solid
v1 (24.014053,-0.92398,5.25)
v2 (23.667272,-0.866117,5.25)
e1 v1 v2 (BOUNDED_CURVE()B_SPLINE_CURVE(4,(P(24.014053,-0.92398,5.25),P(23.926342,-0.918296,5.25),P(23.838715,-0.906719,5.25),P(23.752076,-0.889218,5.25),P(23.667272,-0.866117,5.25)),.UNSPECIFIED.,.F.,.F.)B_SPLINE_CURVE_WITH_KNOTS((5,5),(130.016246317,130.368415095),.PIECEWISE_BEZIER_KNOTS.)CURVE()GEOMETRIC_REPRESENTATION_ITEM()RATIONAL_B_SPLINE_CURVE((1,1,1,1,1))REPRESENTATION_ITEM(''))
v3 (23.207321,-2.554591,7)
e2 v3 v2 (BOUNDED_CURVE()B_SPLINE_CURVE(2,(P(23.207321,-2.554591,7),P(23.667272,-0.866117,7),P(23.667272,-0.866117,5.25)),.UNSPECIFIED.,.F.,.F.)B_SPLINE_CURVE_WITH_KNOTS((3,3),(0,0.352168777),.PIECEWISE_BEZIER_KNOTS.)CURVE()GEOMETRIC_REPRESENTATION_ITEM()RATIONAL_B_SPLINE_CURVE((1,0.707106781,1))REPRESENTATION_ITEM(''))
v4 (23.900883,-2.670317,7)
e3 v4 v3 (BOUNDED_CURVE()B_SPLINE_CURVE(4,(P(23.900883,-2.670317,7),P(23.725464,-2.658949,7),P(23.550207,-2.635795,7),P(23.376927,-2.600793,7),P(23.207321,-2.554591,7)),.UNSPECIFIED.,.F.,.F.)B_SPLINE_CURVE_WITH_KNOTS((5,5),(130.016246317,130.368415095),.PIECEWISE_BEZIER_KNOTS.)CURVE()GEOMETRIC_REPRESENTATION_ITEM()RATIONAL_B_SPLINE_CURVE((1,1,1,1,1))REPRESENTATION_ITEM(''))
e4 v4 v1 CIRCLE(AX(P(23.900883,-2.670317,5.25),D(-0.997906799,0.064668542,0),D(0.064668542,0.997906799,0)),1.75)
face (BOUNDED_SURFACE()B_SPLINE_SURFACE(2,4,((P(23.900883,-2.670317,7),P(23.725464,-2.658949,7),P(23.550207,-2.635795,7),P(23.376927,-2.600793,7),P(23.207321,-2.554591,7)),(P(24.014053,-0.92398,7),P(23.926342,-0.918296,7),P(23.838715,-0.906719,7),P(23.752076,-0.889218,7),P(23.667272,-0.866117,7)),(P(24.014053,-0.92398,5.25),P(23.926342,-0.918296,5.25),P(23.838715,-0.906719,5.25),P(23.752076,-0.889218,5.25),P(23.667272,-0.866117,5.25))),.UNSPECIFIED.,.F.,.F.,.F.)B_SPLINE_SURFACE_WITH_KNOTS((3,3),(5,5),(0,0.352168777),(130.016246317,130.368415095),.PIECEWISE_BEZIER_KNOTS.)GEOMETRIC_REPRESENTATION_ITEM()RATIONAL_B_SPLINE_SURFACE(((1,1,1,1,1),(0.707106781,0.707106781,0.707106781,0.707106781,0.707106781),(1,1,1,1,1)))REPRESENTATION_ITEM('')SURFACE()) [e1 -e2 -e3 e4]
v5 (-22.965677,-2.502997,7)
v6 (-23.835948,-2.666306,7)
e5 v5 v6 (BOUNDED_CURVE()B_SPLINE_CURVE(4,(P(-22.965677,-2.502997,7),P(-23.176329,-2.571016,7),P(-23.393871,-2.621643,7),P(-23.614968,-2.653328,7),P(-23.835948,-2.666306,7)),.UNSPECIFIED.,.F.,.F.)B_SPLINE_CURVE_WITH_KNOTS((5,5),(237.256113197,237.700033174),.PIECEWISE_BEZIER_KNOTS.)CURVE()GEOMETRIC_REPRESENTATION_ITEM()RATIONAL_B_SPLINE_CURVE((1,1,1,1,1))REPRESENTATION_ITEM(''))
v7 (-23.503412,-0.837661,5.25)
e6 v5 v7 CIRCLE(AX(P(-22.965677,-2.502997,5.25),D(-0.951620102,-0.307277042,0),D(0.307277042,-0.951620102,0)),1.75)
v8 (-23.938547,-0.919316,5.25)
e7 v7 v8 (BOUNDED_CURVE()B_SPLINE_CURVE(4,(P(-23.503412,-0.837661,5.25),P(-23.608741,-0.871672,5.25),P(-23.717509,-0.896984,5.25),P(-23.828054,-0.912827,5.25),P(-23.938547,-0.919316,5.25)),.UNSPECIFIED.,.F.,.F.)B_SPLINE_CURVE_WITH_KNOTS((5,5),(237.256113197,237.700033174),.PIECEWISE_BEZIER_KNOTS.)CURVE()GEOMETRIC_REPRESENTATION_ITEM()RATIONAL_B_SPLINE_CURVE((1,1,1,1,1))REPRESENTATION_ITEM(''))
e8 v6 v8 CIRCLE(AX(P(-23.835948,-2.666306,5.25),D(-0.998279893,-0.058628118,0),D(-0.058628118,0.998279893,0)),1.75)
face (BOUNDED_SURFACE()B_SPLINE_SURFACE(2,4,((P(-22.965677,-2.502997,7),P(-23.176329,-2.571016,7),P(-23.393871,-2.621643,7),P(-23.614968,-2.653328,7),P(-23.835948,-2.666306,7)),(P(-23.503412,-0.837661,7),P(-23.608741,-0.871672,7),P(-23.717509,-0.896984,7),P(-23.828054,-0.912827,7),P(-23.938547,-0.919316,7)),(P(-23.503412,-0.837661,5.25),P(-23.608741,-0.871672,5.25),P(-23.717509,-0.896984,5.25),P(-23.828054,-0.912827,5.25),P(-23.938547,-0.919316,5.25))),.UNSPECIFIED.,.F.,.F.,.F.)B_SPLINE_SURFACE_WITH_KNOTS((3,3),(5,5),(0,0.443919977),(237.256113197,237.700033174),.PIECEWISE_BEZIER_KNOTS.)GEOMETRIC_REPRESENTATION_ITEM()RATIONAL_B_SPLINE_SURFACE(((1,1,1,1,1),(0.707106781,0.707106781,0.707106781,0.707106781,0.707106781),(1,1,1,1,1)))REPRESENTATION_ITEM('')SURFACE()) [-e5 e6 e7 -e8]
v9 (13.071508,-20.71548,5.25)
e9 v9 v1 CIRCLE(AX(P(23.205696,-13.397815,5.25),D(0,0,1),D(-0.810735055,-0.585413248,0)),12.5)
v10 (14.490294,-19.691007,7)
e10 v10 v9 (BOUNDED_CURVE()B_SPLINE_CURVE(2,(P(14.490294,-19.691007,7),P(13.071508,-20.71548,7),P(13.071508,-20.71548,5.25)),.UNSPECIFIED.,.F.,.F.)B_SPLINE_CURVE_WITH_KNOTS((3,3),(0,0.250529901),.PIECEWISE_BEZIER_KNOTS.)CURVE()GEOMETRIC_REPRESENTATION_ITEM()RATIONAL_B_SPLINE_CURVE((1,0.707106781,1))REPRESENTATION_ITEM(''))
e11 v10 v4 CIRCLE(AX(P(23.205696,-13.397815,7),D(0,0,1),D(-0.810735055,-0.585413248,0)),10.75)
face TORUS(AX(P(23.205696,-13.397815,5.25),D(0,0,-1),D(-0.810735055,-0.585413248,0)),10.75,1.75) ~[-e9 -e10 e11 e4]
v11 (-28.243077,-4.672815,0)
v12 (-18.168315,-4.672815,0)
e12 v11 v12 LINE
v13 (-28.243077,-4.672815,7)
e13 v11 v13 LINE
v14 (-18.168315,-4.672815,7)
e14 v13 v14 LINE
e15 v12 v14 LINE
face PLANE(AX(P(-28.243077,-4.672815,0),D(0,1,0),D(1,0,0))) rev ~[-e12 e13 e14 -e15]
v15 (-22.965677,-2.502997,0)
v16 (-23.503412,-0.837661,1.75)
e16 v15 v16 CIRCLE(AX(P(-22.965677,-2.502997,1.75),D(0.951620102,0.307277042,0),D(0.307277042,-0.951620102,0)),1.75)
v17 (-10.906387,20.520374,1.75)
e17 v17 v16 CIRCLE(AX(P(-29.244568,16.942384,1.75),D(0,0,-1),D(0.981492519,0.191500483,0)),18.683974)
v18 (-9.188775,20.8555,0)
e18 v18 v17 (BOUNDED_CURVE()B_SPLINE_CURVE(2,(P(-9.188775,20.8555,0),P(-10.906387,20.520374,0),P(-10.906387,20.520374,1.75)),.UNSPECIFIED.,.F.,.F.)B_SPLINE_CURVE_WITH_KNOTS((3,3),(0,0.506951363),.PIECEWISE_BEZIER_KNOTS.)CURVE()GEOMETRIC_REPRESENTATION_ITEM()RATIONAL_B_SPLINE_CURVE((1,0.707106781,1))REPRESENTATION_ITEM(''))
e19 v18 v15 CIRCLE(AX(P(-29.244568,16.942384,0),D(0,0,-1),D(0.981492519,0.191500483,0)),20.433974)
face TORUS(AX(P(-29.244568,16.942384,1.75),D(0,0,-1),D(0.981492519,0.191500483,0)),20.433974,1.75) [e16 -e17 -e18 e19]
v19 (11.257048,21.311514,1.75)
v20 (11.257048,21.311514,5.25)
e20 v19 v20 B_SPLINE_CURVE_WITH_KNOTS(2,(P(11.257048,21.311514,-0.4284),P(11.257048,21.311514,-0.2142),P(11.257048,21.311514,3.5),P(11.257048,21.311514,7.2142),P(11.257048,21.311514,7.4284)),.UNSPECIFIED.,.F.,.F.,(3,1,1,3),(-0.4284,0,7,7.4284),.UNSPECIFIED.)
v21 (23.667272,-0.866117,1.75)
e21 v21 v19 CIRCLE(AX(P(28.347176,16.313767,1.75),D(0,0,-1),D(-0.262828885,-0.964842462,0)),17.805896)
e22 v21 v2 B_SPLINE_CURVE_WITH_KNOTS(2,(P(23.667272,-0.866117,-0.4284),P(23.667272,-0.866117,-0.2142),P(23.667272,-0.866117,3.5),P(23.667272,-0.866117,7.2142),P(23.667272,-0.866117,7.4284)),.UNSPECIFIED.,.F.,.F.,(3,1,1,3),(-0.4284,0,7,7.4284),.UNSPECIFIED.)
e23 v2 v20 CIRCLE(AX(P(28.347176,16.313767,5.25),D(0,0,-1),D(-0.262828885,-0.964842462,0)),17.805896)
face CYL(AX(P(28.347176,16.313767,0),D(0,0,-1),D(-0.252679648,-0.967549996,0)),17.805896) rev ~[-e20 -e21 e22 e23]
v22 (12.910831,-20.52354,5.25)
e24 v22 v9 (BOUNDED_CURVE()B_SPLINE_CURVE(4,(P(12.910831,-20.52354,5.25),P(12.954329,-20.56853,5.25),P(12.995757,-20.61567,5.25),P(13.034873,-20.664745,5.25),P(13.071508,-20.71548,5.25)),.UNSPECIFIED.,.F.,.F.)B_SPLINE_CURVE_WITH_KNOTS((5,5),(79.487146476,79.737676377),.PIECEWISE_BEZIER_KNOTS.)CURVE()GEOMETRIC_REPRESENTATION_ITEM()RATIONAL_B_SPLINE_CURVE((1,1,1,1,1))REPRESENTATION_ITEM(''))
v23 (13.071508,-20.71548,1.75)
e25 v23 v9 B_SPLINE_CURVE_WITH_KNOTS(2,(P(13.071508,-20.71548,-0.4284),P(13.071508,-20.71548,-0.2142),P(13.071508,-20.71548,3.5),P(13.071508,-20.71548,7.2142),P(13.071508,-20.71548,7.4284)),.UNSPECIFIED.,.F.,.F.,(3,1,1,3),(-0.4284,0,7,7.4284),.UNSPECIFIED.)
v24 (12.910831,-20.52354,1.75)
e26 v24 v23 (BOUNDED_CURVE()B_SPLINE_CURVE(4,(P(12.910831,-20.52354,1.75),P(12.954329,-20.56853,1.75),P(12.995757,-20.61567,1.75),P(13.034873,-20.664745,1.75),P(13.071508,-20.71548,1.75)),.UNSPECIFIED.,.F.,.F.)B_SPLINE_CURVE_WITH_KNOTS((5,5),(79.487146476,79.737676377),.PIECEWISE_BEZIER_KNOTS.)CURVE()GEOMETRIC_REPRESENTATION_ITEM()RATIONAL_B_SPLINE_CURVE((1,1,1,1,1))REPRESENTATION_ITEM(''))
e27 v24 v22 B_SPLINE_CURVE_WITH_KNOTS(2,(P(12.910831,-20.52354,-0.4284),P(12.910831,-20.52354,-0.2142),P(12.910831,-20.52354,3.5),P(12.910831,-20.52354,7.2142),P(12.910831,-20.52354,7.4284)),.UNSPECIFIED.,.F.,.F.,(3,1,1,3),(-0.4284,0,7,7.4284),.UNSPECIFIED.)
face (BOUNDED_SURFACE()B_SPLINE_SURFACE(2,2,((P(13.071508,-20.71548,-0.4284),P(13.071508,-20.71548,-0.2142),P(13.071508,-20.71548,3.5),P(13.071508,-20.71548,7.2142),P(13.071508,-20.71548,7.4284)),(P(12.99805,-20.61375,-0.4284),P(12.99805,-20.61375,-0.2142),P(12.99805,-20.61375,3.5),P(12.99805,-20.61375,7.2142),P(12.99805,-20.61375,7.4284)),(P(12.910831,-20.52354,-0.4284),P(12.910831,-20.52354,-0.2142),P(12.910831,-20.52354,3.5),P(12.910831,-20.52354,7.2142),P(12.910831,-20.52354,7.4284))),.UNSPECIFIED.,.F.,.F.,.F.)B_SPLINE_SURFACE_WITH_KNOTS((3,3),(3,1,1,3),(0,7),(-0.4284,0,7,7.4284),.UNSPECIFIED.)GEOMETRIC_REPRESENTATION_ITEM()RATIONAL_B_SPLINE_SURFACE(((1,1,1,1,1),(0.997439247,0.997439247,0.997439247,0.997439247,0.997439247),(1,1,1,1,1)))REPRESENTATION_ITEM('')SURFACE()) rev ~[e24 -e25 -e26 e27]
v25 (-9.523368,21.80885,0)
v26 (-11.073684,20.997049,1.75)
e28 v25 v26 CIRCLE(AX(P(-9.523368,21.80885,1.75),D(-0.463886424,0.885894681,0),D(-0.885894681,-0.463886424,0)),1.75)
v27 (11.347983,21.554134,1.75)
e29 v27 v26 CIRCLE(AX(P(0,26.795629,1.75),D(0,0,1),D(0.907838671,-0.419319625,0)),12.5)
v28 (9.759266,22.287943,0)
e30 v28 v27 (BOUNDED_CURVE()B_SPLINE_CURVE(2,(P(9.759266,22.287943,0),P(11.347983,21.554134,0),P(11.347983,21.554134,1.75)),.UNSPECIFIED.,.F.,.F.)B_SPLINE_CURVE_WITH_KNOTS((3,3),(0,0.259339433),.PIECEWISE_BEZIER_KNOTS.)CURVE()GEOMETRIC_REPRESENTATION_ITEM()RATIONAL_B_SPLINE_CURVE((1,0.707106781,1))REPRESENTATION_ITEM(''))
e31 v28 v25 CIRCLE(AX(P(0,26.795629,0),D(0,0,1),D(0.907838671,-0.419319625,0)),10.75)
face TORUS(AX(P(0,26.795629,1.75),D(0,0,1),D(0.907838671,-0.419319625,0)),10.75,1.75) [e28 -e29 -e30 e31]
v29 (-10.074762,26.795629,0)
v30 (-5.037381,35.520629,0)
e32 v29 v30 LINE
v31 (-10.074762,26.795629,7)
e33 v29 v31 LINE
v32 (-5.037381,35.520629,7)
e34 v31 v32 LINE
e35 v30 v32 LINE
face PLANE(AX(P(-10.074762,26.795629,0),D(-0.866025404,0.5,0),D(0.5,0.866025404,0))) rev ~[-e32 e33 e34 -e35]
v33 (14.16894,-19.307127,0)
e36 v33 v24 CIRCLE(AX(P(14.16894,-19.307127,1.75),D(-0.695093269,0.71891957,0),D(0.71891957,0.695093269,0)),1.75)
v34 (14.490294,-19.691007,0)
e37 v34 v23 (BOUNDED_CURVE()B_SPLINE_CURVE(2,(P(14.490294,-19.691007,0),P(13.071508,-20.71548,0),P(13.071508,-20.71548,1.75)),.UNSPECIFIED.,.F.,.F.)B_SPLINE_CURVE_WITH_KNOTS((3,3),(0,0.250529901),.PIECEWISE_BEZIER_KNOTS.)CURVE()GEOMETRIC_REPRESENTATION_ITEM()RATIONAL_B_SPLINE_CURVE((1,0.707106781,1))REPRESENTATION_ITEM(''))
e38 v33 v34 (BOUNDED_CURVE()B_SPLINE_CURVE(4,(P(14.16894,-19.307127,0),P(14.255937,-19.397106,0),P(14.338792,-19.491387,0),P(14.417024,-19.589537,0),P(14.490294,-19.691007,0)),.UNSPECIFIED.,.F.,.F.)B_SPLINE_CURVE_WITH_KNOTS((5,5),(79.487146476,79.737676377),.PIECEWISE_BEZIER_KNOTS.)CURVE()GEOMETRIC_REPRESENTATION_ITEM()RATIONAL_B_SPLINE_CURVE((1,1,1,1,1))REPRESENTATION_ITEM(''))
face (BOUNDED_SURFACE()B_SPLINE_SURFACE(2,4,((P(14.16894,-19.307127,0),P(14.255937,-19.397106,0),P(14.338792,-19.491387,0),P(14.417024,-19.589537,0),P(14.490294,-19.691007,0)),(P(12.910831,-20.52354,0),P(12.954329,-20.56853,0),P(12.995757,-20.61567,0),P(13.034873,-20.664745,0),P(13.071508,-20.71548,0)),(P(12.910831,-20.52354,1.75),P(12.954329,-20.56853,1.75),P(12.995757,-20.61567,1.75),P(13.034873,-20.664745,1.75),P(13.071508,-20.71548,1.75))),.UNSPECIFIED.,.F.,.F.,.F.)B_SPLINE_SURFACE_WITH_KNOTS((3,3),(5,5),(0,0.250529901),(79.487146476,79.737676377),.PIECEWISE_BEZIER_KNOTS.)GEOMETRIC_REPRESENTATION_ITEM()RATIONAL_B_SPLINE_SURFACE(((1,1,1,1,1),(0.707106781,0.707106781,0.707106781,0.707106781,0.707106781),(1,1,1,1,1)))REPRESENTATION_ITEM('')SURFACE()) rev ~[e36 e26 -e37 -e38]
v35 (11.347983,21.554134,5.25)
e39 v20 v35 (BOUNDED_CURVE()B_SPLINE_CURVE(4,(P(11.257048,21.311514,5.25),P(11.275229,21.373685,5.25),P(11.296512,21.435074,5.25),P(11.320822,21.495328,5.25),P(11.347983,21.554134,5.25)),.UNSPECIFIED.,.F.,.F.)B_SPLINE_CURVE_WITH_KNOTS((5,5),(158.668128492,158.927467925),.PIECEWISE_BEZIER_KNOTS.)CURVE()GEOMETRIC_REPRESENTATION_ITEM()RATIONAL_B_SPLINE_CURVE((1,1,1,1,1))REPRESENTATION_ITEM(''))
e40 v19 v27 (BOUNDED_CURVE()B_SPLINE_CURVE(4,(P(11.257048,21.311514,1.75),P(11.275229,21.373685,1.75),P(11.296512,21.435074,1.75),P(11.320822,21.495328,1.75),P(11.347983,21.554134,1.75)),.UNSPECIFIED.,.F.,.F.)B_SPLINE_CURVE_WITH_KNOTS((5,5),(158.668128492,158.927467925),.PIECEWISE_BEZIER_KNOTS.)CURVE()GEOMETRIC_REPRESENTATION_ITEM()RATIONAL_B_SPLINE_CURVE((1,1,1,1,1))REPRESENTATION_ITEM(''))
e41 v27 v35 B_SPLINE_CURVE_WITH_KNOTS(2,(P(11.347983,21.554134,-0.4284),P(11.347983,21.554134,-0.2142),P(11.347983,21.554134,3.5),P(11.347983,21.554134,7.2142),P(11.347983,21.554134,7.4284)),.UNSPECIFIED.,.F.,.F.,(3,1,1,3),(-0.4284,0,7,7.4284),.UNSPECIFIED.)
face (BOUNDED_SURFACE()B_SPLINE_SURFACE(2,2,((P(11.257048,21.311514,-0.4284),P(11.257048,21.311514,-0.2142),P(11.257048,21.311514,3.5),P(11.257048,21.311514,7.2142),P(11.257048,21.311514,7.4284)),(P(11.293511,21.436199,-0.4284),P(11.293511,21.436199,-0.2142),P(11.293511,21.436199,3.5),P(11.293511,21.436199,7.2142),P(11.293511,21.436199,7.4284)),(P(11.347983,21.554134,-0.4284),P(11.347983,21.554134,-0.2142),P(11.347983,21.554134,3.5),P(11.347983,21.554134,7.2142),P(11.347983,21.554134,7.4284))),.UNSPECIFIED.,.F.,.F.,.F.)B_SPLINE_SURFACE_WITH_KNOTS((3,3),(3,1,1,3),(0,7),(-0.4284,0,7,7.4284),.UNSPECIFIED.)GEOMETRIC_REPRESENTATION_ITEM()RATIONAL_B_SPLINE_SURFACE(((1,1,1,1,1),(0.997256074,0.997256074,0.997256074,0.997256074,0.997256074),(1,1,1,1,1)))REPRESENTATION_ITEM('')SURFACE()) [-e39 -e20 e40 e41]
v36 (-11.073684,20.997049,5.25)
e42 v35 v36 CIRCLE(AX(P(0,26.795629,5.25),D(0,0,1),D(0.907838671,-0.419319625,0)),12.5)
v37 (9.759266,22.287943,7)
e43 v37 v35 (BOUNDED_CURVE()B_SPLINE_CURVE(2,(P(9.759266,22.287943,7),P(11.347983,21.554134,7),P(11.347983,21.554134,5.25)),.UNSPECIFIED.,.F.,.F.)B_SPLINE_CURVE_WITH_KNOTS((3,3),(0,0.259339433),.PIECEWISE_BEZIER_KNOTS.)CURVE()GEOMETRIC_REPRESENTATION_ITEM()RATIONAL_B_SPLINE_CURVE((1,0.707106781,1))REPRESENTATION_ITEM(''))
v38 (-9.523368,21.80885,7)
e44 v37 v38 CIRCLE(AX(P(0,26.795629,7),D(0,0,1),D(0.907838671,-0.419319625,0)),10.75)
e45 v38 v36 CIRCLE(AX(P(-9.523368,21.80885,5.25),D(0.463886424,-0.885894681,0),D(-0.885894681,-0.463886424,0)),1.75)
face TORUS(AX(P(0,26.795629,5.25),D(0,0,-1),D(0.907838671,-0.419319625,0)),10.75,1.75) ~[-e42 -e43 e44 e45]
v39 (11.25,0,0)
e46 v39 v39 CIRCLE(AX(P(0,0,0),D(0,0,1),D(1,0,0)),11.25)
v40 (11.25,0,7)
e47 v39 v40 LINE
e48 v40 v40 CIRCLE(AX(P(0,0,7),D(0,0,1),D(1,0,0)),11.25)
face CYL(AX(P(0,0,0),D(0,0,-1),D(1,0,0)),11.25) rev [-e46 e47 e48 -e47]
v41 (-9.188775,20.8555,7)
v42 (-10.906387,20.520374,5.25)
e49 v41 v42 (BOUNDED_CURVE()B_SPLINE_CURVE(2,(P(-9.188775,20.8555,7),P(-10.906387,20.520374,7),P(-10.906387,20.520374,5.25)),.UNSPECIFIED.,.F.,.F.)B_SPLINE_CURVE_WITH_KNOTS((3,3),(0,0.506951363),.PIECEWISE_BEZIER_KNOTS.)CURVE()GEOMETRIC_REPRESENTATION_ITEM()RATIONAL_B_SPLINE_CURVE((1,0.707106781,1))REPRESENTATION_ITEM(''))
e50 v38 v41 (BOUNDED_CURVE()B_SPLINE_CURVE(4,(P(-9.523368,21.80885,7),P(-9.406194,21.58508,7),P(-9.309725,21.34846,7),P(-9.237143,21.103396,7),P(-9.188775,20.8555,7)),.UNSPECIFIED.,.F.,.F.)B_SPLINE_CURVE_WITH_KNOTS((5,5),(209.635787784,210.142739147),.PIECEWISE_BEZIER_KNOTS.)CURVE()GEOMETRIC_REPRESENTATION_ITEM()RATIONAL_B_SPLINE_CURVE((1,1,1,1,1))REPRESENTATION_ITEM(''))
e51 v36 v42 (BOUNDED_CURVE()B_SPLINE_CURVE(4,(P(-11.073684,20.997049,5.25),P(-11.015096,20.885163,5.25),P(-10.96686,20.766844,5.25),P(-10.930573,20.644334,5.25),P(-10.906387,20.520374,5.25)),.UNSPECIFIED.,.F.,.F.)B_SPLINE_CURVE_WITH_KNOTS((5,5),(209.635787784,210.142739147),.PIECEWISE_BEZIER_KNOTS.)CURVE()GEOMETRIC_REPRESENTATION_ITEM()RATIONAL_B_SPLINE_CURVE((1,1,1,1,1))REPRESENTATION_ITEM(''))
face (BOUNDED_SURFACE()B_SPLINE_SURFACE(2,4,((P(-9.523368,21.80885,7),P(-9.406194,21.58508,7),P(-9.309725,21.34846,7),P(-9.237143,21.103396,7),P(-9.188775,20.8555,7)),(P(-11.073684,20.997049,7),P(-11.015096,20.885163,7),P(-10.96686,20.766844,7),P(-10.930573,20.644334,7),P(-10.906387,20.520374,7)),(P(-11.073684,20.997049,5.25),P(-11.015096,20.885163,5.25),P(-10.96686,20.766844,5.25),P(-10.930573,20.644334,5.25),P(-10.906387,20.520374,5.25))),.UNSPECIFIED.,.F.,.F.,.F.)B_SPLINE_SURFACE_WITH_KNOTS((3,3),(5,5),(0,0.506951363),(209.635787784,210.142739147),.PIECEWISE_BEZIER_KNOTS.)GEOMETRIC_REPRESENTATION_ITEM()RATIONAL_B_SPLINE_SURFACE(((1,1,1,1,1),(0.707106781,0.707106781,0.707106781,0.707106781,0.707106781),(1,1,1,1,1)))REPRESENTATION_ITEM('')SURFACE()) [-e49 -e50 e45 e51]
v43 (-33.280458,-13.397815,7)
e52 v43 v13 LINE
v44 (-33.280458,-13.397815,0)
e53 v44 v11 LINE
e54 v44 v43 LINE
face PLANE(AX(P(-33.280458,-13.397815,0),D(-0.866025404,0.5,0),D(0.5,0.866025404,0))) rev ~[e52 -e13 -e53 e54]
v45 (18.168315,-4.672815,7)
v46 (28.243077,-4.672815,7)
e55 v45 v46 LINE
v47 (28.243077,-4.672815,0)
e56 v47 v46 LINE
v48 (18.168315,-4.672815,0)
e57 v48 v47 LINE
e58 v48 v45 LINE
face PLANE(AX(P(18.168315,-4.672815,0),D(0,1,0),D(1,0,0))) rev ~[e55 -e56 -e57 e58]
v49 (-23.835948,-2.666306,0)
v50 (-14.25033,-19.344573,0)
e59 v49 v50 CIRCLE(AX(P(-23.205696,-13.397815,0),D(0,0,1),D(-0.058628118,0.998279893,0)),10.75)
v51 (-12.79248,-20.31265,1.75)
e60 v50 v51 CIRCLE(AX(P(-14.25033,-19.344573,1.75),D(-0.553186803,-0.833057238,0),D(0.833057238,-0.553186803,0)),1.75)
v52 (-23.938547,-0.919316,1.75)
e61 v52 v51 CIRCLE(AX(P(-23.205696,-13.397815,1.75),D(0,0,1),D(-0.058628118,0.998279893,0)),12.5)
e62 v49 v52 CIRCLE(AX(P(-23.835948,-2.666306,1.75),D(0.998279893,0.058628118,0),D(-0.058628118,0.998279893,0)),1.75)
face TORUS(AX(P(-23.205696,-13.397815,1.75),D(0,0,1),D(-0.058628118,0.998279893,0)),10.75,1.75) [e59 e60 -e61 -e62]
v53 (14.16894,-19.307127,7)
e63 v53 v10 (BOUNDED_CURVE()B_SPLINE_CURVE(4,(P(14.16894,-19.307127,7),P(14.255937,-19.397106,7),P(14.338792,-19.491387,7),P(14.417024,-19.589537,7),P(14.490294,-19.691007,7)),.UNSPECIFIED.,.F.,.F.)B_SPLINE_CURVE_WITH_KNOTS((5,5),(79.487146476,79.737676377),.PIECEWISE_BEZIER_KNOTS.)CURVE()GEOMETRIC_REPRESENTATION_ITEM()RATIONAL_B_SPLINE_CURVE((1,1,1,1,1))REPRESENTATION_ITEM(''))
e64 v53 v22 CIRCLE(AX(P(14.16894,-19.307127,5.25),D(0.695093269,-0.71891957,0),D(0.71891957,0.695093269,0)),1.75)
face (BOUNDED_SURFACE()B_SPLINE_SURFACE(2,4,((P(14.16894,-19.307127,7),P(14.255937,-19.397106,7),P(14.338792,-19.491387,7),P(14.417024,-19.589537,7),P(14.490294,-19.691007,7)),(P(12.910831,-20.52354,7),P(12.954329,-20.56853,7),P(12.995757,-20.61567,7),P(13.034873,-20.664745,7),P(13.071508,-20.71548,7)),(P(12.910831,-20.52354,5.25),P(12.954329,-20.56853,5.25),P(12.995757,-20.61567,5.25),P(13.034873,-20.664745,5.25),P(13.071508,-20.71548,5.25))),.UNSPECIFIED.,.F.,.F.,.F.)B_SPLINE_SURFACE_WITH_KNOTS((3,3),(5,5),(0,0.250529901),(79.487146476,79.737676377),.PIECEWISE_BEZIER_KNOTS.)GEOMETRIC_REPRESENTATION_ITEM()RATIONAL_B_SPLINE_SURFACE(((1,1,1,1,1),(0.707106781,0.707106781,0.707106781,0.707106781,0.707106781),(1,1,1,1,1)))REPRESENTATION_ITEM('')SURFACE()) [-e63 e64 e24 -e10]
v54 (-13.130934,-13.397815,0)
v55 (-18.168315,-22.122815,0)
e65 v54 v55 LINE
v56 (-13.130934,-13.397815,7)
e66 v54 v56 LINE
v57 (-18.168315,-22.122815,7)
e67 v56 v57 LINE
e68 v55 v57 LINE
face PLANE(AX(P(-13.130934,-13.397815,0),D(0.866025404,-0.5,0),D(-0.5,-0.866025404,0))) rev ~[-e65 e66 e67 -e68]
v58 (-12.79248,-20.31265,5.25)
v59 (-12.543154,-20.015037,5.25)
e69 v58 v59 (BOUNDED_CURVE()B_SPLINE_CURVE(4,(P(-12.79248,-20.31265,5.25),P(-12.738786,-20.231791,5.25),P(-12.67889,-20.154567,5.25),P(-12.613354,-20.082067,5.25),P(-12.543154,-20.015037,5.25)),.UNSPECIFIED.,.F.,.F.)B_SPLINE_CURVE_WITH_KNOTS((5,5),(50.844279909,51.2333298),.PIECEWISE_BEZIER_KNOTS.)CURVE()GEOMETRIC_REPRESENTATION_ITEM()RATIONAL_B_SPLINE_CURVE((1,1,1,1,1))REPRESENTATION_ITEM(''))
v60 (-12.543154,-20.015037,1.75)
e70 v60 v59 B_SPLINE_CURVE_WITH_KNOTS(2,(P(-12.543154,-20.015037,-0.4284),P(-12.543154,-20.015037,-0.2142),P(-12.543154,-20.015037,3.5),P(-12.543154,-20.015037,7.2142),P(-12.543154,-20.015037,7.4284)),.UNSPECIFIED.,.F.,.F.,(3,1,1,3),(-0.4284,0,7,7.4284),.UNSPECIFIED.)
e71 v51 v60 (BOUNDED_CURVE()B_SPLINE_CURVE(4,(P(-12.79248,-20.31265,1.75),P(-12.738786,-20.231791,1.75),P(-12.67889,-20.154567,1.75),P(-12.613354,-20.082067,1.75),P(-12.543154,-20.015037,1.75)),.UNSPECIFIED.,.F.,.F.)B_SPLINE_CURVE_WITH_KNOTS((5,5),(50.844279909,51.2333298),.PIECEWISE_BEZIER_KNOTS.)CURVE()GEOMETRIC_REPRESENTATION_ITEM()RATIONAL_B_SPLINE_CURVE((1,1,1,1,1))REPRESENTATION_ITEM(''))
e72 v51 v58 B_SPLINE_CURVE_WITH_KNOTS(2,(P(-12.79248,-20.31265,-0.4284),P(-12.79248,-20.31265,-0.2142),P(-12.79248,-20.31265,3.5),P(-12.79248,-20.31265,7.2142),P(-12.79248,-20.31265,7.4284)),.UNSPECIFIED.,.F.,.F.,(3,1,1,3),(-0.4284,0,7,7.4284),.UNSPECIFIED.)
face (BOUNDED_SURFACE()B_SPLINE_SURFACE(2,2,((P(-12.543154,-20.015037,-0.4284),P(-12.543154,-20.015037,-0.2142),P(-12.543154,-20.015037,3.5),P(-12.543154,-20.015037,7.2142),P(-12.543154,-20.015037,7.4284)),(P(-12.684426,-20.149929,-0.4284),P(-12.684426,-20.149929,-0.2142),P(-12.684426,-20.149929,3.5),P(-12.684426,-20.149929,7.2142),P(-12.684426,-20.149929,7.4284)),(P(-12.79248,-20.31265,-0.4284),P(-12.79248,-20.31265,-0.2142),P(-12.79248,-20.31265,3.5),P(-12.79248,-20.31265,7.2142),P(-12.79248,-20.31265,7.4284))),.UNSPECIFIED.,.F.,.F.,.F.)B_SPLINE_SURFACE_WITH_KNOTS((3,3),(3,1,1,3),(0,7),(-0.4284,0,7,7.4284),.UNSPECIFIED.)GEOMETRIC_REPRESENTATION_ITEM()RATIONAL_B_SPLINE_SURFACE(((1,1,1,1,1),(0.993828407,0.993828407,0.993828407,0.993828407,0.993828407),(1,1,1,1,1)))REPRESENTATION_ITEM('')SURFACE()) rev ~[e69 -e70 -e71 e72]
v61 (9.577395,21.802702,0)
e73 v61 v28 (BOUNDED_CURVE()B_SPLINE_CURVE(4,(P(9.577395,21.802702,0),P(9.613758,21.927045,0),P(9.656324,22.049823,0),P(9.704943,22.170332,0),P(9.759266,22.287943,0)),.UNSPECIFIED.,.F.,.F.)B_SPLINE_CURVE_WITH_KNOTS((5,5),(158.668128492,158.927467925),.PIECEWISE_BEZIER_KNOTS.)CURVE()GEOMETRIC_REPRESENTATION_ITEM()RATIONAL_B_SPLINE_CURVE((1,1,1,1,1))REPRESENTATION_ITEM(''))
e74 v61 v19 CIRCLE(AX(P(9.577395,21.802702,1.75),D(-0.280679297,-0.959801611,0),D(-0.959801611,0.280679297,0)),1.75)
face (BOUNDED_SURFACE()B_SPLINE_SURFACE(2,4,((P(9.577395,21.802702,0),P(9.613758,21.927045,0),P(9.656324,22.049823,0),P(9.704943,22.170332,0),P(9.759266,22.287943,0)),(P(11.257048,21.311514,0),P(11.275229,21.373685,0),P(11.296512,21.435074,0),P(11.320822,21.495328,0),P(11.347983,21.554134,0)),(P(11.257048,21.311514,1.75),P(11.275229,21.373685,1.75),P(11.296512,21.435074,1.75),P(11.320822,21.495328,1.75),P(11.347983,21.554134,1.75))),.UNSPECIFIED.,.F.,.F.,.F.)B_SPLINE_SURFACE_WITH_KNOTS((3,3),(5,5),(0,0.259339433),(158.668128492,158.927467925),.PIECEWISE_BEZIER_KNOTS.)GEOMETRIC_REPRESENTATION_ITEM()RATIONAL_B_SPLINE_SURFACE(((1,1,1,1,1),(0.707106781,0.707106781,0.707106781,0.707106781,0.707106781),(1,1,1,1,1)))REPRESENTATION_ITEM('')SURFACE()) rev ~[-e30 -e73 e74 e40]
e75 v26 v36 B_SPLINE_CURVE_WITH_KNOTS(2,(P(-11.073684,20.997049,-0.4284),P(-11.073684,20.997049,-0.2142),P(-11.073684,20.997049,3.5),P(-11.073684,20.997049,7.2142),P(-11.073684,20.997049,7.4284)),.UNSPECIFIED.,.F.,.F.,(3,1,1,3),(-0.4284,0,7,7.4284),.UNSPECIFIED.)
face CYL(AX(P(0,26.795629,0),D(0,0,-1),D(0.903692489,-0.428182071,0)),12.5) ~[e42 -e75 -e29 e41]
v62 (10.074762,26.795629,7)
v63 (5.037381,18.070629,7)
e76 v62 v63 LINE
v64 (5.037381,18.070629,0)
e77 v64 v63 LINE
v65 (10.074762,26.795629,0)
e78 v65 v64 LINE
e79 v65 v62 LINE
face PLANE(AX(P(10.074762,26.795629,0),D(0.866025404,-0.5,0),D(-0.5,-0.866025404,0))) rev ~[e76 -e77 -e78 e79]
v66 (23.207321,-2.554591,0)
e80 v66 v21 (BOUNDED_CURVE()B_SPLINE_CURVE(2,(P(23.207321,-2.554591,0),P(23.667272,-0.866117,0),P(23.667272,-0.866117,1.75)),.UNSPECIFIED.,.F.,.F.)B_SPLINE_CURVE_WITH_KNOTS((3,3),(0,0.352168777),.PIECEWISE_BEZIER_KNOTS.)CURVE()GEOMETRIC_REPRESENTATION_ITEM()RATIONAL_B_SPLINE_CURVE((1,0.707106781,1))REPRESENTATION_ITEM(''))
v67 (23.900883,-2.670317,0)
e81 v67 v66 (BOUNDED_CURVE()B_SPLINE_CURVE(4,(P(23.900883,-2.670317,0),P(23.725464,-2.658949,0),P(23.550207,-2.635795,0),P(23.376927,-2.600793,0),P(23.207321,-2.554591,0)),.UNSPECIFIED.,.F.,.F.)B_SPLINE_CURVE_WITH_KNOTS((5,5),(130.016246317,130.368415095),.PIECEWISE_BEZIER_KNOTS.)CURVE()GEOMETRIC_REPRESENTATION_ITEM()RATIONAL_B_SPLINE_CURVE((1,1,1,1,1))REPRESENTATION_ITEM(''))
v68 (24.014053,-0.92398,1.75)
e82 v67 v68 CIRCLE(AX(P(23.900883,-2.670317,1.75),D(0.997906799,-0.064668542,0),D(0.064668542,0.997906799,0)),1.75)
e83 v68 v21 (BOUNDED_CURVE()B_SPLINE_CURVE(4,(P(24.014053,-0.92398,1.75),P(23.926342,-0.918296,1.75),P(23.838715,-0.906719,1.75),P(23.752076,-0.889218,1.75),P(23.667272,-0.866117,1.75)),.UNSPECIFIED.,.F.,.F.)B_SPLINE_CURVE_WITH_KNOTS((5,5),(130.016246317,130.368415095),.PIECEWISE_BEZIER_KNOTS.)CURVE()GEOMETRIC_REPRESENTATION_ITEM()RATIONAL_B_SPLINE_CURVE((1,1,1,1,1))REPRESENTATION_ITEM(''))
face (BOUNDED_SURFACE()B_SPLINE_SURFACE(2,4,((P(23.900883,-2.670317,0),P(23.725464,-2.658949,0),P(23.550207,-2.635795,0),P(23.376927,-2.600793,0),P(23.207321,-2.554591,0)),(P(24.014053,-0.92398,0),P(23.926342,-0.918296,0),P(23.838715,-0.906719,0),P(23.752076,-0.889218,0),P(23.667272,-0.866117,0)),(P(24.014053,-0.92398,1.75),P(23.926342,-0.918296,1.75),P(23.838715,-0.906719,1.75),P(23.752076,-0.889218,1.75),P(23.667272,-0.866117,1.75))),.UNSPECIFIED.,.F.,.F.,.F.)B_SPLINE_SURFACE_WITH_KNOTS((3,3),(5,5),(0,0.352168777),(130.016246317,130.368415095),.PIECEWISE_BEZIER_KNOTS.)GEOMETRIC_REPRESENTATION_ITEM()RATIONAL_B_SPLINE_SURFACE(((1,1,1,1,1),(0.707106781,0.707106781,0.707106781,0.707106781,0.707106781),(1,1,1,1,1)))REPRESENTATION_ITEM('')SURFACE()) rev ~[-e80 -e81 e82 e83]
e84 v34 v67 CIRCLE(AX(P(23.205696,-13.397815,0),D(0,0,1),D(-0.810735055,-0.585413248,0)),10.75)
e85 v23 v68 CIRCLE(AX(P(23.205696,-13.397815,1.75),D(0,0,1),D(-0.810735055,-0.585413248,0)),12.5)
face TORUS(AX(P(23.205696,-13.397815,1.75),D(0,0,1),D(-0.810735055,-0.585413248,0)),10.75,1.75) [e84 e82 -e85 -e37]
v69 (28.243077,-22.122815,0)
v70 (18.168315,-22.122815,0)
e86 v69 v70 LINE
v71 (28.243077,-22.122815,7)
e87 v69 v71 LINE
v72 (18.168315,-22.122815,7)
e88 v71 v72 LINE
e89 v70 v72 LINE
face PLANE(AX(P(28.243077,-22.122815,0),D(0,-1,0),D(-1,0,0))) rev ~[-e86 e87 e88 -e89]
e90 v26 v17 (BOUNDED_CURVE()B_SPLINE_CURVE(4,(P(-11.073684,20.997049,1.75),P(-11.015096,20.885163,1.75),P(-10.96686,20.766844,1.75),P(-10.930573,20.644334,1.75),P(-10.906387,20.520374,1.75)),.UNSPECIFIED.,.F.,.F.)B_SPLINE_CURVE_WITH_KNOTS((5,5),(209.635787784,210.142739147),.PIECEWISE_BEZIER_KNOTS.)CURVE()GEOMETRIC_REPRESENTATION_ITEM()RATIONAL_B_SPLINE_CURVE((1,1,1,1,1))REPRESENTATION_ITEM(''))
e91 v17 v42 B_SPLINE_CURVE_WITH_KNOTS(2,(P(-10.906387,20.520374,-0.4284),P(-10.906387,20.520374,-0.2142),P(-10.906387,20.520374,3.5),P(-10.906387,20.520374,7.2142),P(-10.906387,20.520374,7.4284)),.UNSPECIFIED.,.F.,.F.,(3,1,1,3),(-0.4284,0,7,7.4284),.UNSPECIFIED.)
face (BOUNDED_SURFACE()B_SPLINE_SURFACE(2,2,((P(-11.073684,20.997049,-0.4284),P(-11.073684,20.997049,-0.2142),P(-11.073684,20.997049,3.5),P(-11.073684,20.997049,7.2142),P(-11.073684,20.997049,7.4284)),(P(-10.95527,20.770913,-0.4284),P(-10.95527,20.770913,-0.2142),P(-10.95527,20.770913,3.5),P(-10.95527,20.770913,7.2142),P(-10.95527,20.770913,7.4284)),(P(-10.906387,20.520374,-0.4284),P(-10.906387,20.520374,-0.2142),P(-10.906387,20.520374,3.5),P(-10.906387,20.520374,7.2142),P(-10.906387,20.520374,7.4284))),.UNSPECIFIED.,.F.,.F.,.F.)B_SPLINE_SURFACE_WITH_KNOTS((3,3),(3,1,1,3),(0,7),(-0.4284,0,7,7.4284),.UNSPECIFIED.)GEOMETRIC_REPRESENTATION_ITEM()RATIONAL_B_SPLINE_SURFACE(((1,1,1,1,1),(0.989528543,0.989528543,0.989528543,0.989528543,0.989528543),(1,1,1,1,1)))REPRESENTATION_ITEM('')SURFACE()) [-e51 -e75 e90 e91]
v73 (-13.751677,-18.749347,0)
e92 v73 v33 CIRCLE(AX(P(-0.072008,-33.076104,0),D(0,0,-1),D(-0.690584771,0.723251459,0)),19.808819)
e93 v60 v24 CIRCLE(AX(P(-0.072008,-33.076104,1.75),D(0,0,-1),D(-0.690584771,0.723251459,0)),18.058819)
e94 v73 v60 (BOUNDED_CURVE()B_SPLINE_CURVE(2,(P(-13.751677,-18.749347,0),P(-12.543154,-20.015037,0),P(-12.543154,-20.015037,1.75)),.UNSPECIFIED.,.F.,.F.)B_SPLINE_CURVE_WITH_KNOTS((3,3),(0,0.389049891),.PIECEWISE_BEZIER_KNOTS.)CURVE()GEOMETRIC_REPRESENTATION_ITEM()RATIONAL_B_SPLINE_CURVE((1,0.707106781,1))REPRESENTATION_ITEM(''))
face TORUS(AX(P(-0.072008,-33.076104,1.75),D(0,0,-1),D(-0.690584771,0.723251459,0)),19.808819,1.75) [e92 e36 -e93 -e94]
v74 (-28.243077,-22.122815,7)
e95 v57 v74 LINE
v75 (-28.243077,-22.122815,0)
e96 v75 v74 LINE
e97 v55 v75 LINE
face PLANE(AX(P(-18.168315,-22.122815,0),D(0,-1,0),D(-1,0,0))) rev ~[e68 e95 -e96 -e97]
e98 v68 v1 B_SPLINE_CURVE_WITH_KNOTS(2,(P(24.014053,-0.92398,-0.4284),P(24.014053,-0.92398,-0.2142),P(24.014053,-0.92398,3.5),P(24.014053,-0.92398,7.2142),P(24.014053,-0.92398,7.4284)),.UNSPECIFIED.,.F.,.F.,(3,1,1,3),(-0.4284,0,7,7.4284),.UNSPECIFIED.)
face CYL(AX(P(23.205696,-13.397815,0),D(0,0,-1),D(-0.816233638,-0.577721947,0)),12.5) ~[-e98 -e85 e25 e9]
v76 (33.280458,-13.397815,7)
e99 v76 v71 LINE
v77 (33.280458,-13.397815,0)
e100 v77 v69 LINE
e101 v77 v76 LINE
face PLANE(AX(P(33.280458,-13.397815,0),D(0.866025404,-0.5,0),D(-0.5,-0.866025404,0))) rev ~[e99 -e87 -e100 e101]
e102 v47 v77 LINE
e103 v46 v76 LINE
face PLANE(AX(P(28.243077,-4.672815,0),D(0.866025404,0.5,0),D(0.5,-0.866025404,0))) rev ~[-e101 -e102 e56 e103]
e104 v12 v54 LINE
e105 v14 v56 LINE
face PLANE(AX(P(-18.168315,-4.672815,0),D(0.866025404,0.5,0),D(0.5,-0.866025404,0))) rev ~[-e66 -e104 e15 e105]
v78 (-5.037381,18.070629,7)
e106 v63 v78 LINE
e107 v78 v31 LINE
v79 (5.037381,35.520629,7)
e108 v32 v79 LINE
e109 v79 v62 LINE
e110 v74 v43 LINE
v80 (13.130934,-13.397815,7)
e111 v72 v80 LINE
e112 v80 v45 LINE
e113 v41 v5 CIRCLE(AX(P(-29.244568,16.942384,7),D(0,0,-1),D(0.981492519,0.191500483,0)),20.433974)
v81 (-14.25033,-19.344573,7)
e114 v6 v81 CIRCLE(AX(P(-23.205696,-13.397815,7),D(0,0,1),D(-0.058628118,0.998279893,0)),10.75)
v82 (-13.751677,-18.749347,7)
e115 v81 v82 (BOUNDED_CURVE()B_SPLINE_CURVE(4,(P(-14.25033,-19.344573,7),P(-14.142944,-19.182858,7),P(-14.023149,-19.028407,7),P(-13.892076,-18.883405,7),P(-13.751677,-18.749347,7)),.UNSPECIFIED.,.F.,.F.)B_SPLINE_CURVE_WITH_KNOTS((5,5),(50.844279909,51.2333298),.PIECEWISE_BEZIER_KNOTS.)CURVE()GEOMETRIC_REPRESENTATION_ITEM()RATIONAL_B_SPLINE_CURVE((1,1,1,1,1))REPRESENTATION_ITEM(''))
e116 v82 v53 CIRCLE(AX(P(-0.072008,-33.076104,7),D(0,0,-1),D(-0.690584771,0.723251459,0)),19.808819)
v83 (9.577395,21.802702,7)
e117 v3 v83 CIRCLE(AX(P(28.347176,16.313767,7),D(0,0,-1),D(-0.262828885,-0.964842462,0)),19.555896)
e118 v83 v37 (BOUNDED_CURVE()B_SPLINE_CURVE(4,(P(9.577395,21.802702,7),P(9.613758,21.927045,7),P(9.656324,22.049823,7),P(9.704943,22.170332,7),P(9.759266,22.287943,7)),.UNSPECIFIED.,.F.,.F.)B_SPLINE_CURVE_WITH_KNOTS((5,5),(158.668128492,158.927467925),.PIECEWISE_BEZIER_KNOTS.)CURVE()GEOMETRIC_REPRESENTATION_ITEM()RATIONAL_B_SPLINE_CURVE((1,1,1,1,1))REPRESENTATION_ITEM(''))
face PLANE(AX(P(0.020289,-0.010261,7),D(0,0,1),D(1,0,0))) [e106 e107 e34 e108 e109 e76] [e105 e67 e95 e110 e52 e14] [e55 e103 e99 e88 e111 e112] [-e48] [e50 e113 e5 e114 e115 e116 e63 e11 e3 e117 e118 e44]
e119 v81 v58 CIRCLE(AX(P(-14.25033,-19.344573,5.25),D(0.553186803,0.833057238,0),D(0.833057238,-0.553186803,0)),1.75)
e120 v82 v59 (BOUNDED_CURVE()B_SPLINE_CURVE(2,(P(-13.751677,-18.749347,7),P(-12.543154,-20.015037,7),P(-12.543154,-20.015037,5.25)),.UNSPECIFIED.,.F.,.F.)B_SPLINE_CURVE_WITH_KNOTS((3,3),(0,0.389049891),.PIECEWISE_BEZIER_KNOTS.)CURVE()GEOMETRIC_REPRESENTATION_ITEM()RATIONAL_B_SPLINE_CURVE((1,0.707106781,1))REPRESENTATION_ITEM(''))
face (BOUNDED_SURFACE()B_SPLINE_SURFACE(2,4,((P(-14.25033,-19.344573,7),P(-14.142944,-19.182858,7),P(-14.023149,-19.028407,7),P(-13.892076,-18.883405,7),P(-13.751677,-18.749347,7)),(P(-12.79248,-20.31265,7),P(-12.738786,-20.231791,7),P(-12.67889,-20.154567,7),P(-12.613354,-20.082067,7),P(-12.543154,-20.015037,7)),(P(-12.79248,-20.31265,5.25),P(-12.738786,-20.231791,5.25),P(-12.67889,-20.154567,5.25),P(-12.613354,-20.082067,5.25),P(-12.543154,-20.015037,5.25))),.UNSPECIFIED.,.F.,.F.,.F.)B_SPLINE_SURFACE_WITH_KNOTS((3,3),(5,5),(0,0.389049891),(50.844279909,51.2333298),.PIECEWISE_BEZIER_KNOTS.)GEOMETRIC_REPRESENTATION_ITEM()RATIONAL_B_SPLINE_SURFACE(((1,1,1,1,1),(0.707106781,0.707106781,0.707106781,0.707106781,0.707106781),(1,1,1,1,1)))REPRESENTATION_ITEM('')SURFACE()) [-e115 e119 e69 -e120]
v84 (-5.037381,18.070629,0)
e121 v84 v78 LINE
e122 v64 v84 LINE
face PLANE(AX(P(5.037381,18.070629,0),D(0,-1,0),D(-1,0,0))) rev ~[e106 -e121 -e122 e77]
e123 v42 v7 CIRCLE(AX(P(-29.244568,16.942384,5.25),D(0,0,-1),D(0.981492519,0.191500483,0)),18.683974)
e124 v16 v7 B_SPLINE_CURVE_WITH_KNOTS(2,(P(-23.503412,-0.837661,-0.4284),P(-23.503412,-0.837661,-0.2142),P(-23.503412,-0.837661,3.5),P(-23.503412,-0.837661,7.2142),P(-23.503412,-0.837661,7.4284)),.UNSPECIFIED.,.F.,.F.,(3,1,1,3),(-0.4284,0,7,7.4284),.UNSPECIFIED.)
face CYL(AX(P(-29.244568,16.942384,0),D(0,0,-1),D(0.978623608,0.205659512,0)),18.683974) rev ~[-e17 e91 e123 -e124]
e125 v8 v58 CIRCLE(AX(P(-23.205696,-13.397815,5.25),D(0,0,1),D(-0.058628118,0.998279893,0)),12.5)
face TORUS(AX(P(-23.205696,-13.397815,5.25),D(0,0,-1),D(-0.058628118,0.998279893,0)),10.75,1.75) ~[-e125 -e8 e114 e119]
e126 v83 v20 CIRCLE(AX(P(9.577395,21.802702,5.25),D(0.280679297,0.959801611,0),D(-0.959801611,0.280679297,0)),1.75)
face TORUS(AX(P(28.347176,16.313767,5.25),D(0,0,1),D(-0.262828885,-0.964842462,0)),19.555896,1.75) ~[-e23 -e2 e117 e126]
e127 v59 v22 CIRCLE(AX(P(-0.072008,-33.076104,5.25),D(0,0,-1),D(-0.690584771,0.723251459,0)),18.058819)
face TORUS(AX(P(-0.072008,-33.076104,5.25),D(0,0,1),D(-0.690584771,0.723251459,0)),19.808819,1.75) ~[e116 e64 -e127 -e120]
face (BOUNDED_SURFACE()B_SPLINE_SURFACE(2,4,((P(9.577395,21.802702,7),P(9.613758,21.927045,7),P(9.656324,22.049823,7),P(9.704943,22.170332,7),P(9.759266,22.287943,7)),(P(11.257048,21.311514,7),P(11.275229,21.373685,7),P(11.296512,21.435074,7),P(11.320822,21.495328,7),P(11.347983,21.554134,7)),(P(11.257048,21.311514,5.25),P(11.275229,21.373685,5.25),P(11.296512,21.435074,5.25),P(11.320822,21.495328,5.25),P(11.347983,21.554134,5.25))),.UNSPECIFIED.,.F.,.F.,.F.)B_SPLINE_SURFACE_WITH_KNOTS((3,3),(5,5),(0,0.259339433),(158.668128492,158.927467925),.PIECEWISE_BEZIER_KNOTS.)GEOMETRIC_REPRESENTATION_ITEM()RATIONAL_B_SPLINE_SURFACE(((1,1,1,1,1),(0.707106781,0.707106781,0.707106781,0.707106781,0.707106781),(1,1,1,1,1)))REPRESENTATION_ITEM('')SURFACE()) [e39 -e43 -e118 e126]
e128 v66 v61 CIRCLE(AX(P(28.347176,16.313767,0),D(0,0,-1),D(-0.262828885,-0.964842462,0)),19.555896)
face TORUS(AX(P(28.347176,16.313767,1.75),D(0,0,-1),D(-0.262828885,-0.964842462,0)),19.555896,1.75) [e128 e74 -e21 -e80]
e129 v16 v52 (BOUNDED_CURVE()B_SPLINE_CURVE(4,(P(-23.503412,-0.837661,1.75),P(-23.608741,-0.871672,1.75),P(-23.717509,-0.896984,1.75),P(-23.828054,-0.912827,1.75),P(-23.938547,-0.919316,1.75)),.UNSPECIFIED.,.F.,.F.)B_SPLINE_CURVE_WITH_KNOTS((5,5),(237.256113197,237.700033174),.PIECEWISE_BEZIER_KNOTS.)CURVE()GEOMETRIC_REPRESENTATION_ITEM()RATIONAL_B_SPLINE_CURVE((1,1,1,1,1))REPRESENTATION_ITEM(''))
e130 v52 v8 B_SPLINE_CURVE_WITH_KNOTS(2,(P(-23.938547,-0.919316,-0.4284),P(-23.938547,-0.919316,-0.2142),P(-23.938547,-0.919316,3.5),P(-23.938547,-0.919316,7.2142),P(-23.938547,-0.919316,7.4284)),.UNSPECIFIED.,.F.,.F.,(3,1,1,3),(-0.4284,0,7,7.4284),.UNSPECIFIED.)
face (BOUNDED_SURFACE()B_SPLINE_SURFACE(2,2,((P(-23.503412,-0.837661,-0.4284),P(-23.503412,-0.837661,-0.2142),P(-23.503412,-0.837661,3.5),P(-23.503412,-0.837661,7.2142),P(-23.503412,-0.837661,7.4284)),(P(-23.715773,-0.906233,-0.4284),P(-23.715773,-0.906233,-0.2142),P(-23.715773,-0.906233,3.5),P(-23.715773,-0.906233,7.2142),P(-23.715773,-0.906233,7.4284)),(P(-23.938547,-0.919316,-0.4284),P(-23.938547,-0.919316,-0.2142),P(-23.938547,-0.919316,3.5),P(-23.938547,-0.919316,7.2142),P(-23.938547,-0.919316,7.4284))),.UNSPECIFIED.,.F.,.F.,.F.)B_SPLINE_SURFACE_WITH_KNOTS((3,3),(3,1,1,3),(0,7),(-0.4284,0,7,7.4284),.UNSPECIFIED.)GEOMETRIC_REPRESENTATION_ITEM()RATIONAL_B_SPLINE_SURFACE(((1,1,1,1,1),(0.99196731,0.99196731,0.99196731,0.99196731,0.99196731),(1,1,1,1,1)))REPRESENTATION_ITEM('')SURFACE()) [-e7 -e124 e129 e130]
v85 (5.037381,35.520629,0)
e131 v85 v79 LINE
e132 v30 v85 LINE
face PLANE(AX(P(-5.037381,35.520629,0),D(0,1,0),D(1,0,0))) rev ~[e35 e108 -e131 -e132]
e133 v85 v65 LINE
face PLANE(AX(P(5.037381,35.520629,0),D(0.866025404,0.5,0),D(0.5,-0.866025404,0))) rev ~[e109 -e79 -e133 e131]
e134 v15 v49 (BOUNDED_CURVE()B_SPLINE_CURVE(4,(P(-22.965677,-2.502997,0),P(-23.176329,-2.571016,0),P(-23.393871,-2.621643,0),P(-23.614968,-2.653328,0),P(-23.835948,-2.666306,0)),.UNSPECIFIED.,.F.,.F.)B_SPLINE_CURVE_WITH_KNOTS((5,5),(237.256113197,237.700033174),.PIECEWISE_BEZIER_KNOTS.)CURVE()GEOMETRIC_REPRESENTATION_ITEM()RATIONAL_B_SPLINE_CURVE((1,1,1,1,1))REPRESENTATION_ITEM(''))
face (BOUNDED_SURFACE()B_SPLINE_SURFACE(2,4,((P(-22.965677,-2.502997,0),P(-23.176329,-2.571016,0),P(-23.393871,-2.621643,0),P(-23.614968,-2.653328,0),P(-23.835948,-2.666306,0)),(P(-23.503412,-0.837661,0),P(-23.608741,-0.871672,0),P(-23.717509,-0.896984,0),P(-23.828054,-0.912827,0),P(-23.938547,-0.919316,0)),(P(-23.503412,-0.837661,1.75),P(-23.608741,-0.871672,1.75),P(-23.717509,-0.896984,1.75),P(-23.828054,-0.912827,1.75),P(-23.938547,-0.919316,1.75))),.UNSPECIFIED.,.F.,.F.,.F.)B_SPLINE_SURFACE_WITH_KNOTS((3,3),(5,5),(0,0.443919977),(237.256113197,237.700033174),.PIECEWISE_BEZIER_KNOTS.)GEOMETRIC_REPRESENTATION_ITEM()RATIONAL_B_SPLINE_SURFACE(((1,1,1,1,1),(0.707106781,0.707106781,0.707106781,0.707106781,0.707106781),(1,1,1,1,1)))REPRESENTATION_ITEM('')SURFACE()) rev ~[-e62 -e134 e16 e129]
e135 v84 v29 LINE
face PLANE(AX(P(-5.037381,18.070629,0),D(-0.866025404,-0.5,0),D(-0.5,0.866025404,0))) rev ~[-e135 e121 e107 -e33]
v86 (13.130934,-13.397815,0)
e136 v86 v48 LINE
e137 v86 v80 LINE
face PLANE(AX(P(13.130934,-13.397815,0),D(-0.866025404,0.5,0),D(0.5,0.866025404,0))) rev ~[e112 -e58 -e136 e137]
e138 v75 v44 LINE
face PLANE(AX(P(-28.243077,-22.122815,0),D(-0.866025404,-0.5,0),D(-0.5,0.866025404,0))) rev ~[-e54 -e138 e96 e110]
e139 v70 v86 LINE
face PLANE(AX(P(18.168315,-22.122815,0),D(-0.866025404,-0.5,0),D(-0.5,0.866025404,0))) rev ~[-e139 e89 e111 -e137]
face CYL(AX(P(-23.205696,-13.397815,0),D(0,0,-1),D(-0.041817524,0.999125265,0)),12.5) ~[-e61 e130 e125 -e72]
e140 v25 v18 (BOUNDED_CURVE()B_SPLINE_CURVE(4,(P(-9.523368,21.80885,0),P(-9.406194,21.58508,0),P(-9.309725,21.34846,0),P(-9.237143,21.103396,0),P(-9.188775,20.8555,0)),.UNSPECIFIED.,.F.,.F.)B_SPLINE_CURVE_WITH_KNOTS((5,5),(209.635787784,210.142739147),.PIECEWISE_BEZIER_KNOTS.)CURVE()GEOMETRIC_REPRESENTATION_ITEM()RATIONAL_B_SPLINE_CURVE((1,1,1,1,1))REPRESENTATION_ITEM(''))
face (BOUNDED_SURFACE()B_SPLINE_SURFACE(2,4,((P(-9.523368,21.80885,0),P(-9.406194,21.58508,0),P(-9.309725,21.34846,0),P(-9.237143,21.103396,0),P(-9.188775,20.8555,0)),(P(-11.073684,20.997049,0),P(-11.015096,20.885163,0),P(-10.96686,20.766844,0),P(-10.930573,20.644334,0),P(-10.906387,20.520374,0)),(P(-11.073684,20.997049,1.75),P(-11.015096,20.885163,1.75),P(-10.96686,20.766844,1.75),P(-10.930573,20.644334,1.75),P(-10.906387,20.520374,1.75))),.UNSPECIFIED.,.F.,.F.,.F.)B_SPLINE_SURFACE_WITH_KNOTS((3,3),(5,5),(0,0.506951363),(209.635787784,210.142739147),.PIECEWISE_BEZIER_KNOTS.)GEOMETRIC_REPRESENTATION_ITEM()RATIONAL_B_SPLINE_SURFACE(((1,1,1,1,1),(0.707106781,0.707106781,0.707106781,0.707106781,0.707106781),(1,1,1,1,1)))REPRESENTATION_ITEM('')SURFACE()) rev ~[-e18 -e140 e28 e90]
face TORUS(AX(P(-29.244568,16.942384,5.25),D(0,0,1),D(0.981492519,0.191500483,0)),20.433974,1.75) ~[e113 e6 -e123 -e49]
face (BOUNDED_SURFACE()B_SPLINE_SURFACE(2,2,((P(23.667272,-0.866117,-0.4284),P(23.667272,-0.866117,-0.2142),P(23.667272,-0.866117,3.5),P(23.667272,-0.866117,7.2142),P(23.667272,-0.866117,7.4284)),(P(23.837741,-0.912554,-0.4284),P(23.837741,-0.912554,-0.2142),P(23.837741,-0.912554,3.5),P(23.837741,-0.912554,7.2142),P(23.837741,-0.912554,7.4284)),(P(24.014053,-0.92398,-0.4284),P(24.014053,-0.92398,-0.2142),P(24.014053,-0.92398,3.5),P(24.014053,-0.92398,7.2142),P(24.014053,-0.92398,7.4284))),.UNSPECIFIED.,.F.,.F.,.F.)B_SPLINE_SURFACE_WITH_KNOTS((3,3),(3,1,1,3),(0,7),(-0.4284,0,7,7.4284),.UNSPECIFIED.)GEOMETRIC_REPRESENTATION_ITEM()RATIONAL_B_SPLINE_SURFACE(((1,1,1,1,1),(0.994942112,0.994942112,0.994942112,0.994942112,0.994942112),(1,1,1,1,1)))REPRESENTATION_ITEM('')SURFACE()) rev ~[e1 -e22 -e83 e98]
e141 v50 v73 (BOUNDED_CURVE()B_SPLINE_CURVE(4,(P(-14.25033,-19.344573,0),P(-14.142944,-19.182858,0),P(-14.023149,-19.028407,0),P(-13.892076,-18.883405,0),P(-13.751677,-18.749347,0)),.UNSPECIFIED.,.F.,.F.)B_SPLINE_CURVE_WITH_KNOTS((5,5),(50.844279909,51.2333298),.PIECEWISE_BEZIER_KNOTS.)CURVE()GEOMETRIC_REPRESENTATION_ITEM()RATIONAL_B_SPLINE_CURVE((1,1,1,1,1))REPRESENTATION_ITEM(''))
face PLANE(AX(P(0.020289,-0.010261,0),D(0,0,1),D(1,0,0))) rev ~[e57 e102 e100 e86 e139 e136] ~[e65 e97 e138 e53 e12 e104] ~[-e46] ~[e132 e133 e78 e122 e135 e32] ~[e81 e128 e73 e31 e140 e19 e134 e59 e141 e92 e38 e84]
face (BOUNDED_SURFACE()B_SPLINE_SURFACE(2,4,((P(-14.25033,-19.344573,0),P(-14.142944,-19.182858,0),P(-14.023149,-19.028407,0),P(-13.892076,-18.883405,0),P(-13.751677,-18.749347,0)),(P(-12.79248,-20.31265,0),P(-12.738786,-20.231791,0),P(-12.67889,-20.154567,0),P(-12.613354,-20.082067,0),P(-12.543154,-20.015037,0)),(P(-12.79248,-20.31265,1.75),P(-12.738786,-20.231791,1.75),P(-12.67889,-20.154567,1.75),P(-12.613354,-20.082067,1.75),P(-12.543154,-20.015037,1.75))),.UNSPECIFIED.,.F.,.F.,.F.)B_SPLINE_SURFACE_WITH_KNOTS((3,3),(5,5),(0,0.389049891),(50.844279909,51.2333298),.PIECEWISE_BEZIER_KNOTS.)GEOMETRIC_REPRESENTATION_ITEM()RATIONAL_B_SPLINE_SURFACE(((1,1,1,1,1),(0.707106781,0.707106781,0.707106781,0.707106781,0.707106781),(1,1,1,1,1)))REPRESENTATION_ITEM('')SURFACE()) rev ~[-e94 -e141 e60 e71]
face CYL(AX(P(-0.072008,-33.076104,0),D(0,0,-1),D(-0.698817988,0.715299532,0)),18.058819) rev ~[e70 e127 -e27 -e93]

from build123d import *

# Parameters (mm, degrees)
F0_R     = 11.25
F1_DEPTH = 7
F2_F1_R  = 1.75
F2_F2_R  = 1.75


# Not quite as in the source:
# - a feature names something its author has since deleted; it is built from what else it names


with BuildPart() as f1:
    # F0 (on Top) → F1 (new body)
    with BuildSketch(Plane.XY):
        with BuildLine():
            ThreePointArc((23.8479882297, -0.9143272054), (12.8207682574, 7.5970822448), (11.2961561087, 21.4433535458))
            ThreePointArc((11.2961561087, 21.4433535458), (-0.3696422444, 39.2901628216), (-10.9599899611, 20.7849206513))
            ThreePointArc((-10.9599899611, 20.7849206513), (-13.1426262864, 7.4651290037), (-23.7284148542, -0.908748907))
            ThreePointArc((-23.7284148542, -0.908748907), (-34.0498321112, -19.6151057374), (-12.6918356784, -20.1586390273))
            ThreePointArc((-12.6918356784, -20.1586390273), (0.2517315357, -15.0201868131), (13.0027753206, -20.6193390506))
            ThreePointArc((13.0027753206, -20.6193390506), (34.1566443936, -19.4249802921), (23.8479882297, -0.9143272054))
        make_face()
        Polygon((-13.1309336016, -13.3978147163), (-18.1683147003, -22.1228147163), (-28.2430768977, -22.1228147163), (-33.2804579963, -13.3978147163), (-28.2430768977, -4.6728147163), (-18.1683147003, -4.6728147163), align=None, mode=Mode.SUBTRACT)
        Polygon((18.1683147003, -4.6728147163), (28.2430768977, -4.6728147163), (33.2804579963, -13.3978147163), (28.2430768977, -22.1228147163), (18.1683147003, -22.1228147163), (13.1309336016, -13.3978147163), align=None, mode=Mode.SUBTRACT)
        Circle(F0_R, mode=Mode.SUBTRACT)
        Polygon((-5.0373810987, 35.5206294325), (5.0373810987, 35.5206294325), (10.0747621974, 26.7956294325), (5.0373810987, 18.0706294325), (-5.0373810987, 18.0706294325), (-10.0747621974, 26.7956294325), align=None, mode=Mode.SUBTRACT)
    extrude(amount=F1_DEPTH)

    # F2: fillet of radius 1.75 on 14 edges, made by hand

    # F2_f1
    f2_f1_edges = [f1.edges().sort_by_distance(p)[0] for p in [
        (13.0027753206, -20.6193390506, 3.5),
        (23.8479882297, -0.9143272054, 3.5),
        (11.2961561087, 21.4433535458, 3.5),
        (-10.9599899611, 20.7849206513, 3.5),
        (-23.7284148542, -0.908748907, 3.5),
        (-12.6918356784, -20.1586390273, 3.5),
    ]]
    fillet(f2_f1_edges, radius=F2_F1_R)

    # F2_f2
    f2_f2_edges = [f1.edges().sort_by_distance(p)[0] for p in [
        (-34.043255935, -19.6265618053, 0),
        (-34.043255935, -19.6265618053, 7),
        (-23.7183868319, -0.8923048018, 7),
        (-12.6760959015, -20.1569074189, 7),
        (-23.7183868319, -0.8923048018, 0),
        (-12.6760959015, -20.1569074189, 0),
    ]]
    fillet(f2_f2_edges, radius=F2_F2_R)


solid = f1.part
